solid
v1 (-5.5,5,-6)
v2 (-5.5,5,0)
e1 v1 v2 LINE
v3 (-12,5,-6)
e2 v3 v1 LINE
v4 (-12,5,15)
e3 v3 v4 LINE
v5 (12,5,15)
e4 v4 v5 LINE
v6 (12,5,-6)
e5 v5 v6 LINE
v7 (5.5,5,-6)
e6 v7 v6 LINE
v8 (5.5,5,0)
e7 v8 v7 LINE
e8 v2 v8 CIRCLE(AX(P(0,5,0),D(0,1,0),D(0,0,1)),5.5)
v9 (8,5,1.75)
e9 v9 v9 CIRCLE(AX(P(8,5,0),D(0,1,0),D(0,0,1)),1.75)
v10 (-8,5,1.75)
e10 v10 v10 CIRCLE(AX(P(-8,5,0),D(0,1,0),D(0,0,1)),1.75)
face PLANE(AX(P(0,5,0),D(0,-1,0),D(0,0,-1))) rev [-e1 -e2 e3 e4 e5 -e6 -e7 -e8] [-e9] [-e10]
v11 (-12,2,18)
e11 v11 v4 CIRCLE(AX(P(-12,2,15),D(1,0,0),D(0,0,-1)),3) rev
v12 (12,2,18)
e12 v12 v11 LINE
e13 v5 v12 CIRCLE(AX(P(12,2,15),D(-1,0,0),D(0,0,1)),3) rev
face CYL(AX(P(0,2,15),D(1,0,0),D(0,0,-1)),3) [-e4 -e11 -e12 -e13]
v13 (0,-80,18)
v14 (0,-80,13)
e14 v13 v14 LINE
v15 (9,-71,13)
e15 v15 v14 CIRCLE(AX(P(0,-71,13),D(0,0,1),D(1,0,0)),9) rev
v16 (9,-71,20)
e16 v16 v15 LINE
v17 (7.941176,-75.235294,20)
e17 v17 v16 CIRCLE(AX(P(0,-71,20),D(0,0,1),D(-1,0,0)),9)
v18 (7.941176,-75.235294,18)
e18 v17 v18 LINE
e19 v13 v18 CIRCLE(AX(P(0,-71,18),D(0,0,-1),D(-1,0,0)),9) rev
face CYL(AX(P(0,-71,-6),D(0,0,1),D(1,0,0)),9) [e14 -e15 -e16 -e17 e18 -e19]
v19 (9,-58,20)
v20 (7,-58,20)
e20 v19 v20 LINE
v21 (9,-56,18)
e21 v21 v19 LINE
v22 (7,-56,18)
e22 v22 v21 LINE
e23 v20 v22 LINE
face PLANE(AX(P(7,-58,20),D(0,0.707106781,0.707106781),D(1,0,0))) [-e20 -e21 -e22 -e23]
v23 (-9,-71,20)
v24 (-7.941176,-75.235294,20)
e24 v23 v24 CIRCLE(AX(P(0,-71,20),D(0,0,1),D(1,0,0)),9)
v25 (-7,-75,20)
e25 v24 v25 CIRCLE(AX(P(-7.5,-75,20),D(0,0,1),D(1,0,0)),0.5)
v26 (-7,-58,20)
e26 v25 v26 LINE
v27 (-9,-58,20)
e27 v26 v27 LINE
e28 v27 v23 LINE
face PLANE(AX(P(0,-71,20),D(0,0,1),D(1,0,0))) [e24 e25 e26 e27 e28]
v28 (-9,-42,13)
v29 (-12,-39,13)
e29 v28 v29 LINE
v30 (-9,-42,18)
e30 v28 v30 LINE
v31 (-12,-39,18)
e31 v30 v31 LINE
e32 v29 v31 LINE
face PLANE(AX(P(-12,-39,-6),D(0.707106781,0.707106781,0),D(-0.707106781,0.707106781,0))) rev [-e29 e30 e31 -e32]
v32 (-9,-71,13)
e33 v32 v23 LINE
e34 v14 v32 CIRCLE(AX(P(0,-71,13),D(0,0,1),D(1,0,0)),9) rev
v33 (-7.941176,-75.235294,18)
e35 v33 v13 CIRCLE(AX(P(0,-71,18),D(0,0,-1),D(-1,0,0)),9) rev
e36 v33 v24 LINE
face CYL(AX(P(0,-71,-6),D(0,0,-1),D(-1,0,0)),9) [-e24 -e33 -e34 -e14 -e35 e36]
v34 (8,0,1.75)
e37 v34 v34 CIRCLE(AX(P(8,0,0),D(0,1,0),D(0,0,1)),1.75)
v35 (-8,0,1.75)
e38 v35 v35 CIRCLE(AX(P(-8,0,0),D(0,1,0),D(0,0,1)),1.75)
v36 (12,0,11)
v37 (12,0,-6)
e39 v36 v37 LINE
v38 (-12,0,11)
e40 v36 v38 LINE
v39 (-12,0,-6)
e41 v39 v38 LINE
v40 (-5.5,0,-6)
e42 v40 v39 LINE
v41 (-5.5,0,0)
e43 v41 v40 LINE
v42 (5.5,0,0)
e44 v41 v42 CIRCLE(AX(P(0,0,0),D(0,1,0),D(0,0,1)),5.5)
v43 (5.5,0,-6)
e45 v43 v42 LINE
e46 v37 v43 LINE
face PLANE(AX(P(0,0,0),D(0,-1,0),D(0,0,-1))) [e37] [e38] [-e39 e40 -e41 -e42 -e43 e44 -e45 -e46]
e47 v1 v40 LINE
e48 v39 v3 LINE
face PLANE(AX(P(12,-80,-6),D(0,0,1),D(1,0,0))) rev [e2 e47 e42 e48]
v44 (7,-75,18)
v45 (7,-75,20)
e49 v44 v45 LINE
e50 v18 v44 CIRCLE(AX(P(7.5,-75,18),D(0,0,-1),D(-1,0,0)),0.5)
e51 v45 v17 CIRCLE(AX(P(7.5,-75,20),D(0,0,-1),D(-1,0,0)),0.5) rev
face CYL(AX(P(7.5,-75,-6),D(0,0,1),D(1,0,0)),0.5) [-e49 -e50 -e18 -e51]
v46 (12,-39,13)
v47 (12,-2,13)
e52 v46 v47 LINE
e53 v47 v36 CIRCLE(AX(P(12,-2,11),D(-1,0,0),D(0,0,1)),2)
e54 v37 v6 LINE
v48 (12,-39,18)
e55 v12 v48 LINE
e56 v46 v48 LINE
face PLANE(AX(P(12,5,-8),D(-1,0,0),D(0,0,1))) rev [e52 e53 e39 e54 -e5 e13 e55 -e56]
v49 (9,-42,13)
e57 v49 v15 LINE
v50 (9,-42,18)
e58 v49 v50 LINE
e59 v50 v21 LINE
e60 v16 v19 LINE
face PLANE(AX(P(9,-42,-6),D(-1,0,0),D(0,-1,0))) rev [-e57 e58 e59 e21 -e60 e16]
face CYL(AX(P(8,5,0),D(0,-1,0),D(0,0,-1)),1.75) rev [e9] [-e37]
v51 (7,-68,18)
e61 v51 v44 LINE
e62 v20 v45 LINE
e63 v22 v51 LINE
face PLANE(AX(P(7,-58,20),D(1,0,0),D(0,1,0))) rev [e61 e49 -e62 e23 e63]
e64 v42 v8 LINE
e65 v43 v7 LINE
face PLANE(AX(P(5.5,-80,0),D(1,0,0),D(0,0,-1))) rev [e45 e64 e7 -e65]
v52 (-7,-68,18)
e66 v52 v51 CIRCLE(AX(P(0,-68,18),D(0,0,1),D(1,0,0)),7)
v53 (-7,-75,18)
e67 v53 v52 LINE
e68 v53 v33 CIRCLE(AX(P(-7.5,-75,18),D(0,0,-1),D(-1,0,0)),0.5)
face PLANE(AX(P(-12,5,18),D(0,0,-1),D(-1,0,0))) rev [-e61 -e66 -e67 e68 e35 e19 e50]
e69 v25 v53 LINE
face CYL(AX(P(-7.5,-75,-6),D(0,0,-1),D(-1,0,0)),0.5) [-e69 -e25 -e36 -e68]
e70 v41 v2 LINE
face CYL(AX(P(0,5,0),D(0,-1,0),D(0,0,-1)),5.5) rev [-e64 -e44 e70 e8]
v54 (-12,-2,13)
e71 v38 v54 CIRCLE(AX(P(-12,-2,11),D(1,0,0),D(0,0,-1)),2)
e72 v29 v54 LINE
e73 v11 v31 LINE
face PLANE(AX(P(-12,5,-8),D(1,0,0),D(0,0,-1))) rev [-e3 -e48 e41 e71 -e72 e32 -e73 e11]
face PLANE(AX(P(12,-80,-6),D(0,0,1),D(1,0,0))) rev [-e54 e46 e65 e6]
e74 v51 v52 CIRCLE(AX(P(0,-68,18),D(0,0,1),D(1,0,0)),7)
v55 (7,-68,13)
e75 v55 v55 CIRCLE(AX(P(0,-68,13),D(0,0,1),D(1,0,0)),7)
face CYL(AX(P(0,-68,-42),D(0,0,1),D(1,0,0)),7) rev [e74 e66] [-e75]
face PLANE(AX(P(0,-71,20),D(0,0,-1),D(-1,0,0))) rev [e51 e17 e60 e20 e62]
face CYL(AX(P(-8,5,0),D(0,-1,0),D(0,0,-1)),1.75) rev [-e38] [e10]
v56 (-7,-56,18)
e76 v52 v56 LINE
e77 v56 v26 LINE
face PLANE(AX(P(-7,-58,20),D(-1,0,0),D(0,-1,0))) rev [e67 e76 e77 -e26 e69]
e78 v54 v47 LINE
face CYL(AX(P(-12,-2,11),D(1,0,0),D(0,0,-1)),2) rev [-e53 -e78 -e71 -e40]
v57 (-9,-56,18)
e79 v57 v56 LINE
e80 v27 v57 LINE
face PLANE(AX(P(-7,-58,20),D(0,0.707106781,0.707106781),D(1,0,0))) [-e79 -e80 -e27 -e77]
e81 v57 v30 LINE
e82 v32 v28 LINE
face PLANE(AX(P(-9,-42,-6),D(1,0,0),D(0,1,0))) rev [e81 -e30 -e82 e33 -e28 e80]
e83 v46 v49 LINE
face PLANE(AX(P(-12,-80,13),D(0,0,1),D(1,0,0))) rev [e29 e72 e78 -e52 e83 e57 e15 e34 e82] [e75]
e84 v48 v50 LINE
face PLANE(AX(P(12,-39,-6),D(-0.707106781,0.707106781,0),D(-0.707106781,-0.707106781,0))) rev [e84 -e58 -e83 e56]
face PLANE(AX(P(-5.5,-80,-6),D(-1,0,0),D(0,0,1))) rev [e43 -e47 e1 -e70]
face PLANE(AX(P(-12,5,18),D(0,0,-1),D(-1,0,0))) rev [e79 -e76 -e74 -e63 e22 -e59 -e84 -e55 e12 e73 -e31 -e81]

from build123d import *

# Parameters (mm, degrees)
SKETCH1_R           = 5.5
SKETCH1_R_2         = 1.75
BOSS_EXTRUDE2_DEPTH = 5
SKETCH2_W           = 24
SKETCH2_H           = 5
BOSS_EXTRUDE3_DEPTH = 80
FILLET1_R           = 3
FILLET2_R           = 2
SKETCH3_R           = 7
CUT_EXTRUDE1_DEPTH  = 60
SKETCH4_W           = 24
SKETCH4_H           = 2
CUT_EXTRUDE2_DEPTH  = 88.709748603
SKETCH5_W           = 11
SKETCH5_H           = 6
CUT_EXTRUDE3_DEPTH  = 88.709748603
CUT_EXTRUDE4_DEPTH  = 85.380092439
FILLET4_R           = 9
BOSS_EXTRUDE4_DEPTH = 2
CHAMFER1_SIZE       = 2
FILLET5_R           = 0.5


with BuildPart() as part:
    # Sketch1 → Boss-Extrude2 (new body)
    with BuildSketch(Plane(origin=(0, 0, 0), x_dir=(1, 0, 0), z_dir=(0, 1, 0))):
        Polygon((-12, 8), (-12, -18), (12, -18), (12, 5.5), (12, 8), (0, 8), align=None)
        with Locations(Location((0, 0, 0), (0, 0, 270))):
            Circle(SKETCH1_R, mode=Mode.SUBTRACT)
        with Locations(Location((-8, 0, 0), (0, 0, 270))):
            Circle(SKETCH1_R_2, mode=Mode.SUBTRACT)
        with Locations(Location((8, 0, 0), (0, 0, 270))):
            Circle(SKETCH1_R_2, mode=Mode.SUBTRACT)
    extrude(amount=BOSS_EXTRUDE2_DEPTH)

    # Sketch2 → Boss-Extrude3 (add)
    with BuildSketch(Plane.XZ):
        with Locations((0, 15.5)):
            Rectangle(SKETCH2_W, SKETCH2_H)
    extrude(amount=BOSS_EXTRUDE3_DEPTH)

    # Fillet1
    fillet1_edges = [part.edges().sort_by_distance(p)[0] for p in [
        (0, 5, 18),
    ]]
    fillet(fillet1_edges, radius=FILLET1_R)

    # Fillet2
    fillet2_edges = [part.edges().sort_by_distance(p)[0] for p in [
        (0, 0, 13),
    ]]
    fillet(fillet2_edges, radius=FILLET2_R)

    # Sketch3 → Cut-Extrude1 (cut)
    with BuildSketch(Plane.XY.offset(18)):
        with Locations((0, -68)):
            Circle(SKETCH3_R)
    extrude(amount=-CUT_EXTRUDE1_DEPTH, mode=Mode.SUBTRACT)

    # Sketch4 → Cut-Extrude2 (cut, through all)
    with BuildSketch(Plane(origin=(0, 5, 0), x_dir=(1, 0, 0), z_dir=(0, 1, 0))):
        with Locations((0, 7)):
            Rectangle(SKETCH4_W, SKETCH4_H)
    extrude(amount=-CUT_EXTRUDE2_DEPTH, mode=Mode.SUBTRACT)

    # Sketch5 → Cut-Extrude3 (cut, through all)
    with BuildSketch(Plane(origin=(0, 5, 0), x_dir=(1, 0, 0), z_dir=(0, 1, 0))):
        with Locations((0, 3)):
            Rectangle(SKETCH5_W, SKETCH5_H)
    extrude(amount=-CUT_EXTRUDE3_DEPTH, mode=Mode.SUBTRACT)

    # Sketch6 → Cut-Extrude4 (cut, through all)
    with BuildSketch(Plane.XY.offset(18)):
        Polygon((-12, -39), (-9, -42), (-9, -80), (-12, -80), align=None)
        Polygon((9, -80), (12, -80), (12, -39), (9, -42), align=None)
    extrude(amount=-CUT_EXTRUDE4_DEPTH, mode=Mode.SUBTRACT)

    # Fillet4
    fillet4_edges = [part.edges().sort_by_distance(p)[0] for p in [
        (9, -80, 15.5),
        (-9, -80, 15.5),
    ]]
    fillet(fillet4_edges, radius=FILLET4_R - 0.0001)  # a hair under: the kernel refuses the full size

    # Sketch7 → Boss-Extrude4 (add)
    with BuildSketch(Plane.XY.offset(18)):
        with BuildLine():
            Line((-7, -58), (-7, -76.656854249))
            ThreePointArc((-7, -76.656854249), (-8.485281374, -74), (-9, -71))
            Line((-9, -71), (-9, -58))
            Line((-9, -58), (-7, -58))
        make_face()
        with BuildLine():
            Line((7, -58), (9, -58))
            Line((9, -58), (9, -71))
            ThreePointArc((9, -71), (8.485281374, -74), (7, -76.656854249))
            Line((7, -76.656854249), (7, -58))
        make_face()
    extrude(amount=BOSS_EXTRUDE4_DEPTH)

    # Chamfer1
    chamfer1_edges = [part.edges().sort_by_distance(p)[0] for p in [
        (8, -58, 18),
        (-8, -58, 18),
    ]]
    chamfer(chamfer1_edges, length=CHAMFER1_SIZE - 0.0001)  # a hair under: the kernel refuses the full size

    # Fillet5
    fillet5_edges = [part.edges().sort_by_distance(p)[0] for p in [
        (-7, -76.656854249, 19),
        (7, -76.656854249, 19),
    ]]
    fillet(fillet5_edges, radius=FILLET5_R)


solid = part.part
